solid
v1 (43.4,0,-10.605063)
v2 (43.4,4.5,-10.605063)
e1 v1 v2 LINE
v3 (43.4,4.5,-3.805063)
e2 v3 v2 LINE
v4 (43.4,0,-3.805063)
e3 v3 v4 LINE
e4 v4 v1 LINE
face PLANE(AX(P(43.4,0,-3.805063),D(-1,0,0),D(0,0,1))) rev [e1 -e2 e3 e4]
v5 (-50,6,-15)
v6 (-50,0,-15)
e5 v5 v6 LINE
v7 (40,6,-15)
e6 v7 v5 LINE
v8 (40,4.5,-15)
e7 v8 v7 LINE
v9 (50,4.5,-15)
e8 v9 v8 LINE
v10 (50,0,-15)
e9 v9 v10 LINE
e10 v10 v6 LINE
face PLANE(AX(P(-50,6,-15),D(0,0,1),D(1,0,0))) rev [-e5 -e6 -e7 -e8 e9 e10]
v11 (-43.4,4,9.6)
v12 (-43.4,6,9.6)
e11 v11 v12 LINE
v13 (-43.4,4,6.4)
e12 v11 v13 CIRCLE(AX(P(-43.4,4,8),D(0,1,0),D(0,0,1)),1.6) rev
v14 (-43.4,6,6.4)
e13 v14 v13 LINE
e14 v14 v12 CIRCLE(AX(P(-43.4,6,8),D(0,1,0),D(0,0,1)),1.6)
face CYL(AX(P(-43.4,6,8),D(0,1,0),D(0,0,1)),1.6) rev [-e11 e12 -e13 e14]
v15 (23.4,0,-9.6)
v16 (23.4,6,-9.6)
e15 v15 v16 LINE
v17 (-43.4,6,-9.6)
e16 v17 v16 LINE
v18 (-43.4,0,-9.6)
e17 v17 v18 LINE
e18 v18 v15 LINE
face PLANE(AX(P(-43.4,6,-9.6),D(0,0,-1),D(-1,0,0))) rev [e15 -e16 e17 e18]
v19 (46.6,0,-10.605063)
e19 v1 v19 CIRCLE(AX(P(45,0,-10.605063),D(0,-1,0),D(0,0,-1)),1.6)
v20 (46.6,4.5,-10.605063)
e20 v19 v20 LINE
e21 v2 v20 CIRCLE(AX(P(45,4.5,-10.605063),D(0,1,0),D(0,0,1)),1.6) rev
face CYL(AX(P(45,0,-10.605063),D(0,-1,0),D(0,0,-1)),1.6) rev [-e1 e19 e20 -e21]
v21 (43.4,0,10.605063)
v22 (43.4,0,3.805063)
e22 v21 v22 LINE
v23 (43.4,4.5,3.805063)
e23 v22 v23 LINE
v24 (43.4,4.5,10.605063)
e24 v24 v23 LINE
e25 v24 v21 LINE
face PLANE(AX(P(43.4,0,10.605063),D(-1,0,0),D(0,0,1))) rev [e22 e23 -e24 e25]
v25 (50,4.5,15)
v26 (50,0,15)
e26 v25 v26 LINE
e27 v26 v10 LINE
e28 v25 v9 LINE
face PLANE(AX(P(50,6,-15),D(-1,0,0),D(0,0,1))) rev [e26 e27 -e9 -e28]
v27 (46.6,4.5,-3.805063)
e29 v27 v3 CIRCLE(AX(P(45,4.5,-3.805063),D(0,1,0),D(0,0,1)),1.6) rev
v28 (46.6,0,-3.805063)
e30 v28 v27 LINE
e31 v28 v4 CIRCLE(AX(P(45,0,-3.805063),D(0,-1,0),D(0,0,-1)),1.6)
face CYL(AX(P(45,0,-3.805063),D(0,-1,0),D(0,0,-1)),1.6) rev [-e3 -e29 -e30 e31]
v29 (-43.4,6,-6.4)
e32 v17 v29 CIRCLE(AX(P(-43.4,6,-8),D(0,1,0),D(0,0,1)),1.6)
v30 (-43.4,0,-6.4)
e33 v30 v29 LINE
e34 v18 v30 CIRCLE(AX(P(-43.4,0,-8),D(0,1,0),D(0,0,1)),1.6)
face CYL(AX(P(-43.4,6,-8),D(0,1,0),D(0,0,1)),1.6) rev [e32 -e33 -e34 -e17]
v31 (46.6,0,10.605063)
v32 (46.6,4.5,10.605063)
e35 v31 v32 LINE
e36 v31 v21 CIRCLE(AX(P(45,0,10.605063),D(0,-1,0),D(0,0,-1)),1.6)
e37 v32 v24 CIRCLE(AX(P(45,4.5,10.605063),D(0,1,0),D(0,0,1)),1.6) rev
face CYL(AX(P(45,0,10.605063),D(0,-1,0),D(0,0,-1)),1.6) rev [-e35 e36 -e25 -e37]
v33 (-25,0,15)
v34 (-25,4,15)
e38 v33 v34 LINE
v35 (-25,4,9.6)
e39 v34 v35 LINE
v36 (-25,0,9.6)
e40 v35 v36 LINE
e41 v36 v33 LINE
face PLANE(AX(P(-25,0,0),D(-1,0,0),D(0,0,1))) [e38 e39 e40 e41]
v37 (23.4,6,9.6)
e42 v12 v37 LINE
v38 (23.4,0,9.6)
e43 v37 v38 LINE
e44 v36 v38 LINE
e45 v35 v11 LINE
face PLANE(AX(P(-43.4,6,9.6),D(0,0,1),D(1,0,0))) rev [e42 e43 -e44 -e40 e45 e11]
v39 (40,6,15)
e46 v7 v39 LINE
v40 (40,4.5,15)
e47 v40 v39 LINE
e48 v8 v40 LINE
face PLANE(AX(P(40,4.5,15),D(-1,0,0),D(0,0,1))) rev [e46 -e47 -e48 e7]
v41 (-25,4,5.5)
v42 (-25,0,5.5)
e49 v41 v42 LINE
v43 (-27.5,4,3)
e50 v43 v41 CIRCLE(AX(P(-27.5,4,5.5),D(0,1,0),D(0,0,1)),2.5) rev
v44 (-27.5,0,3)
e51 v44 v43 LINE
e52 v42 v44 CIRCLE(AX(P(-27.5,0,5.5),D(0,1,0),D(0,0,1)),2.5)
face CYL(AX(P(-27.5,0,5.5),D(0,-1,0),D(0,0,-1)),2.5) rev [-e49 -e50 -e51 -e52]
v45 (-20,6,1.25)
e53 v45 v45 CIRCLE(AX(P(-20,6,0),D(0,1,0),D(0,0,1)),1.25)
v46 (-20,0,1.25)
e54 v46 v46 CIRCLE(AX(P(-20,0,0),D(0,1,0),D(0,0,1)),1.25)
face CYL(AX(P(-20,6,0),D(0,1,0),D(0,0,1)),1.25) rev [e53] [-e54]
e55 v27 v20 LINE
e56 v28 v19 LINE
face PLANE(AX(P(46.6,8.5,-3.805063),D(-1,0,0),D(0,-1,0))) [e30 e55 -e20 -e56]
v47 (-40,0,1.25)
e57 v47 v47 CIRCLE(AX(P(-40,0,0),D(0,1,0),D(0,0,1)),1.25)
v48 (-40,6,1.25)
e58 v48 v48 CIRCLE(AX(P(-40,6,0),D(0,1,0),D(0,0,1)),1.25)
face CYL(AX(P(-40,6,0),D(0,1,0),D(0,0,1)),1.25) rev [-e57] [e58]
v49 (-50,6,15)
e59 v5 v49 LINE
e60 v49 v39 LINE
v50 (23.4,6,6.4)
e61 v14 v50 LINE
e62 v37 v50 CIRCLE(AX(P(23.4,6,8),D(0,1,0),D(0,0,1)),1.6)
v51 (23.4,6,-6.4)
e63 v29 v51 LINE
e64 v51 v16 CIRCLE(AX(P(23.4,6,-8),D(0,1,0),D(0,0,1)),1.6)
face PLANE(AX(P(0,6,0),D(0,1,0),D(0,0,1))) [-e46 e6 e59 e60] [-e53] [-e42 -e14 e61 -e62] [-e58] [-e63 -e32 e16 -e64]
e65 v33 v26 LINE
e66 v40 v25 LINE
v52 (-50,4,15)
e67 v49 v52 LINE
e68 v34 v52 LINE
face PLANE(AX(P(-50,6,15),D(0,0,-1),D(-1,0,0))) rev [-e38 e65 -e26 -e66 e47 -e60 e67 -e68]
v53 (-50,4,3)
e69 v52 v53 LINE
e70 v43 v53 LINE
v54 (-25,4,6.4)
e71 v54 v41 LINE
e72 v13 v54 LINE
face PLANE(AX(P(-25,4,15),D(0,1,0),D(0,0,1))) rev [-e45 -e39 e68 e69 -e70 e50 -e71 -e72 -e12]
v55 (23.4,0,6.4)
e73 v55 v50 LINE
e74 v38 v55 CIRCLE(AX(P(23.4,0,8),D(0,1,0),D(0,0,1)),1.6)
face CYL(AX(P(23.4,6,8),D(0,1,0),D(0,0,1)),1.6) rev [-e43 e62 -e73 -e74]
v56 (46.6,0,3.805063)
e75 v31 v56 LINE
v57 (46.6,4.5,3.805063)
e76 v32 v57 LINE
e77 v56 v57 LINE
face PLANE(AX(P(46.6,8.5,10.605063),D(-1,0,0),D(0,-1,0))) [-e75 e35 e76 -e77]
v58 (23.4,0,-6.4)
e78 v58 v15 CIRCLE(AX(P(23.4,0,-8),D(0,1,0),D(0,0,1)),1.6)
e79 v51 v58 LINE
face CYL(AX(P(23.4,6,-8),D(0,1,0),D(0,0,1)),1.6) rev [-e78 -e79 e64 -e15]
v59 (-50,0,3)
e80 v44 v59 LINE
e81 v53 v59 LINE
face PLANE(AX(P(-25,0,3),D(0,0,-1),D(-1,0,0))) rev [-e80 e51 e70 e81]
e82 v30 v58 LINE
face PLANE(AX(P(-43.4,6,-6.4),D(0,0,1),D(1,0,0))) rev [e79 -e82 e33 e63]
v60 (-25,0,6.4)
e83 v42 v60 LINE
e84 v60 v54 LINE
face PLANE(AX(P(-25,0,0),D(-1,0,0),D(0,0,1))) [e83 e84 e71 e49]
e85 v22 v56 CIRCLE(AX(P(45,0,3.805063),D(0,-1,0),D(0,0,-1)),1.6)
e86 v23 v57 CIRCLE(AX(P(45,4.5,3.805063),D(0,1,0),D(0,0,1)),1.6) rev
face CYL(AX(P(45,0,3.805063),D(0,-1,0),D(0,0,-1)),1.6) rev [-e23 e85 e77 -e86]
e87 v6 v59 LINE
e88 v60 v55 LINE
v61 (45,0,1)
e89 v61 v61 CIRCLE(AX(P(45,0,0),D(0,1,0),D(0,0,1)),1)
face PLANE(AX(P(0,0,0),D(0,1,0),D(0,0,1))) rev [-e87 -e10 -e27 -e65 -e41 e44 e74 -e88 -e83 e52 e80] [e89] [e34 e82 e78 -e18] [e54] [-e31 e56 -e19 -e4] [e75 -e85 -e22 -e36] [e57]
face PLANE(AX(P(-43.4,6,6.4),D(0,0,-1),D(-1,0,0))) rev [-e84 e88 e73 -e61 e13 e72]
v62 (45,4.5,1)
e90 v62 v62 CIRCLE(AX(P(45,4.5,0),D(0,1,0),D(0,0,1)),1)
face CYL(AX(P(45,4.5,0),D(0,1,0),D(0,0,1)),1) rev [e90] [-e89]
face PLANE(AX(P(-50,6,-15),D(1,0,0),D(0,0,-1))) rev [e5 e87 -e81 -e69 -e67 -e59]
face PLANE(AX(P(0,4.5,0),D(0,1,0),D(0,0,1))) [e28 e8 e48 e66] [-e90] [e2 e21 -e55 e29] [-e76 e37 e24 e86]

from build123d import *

# Parameters (mm, degrees)
SKIZZE1_W                       = 100
SKIZZE1_H                       = 30
AUFSATZ_LINEAR_AUSTRAGEN1_DEPTH = 6
DURCHGANGSLOCH_F_R_M31_DEPTH    = 6
DURCHGANGSLOCH_F_R_M32_DEPTH    = 6
M3_GEWINDEBOHRUNG1_D            = 2.5
SKIZZE12_W                      = 12
SKIZZE12_H                      = 4
SCHNITT_LINEAR_AUSTRAGEN1_DEPTH = 25
VERRUNDUNG1_R                   = 2.5
SKIZZE13_W                      = 10
SKIZZE13_H                      = 30
SCHNITT_LINEAR_AUSTRAGEN2_DEPTH = 1.5
F_2_0MM_STIFTLOCH1_D            = 2
F_2_0MM_STIFTLOCH1_DEPTH        = 8.5
F_2_0MM_STIFTLOCH1_TIP          = 0.600860619


# Read off the part's stored shape, not the designer's step: Durchgangsloch für M31, Durchgangsloch für M32
with BuildPart() as part:
    # Skizze1 → Aufsatz-Linear austragen1 (new body)
    with BuildSketch(Plane(origin=(0, 0, 0), x_dir=(1, 0, 0), z_dir=(0, 1, 0))):
        Rectangle(SKIZZE1_W, SKIZZE1_H)
    extrude(amount=AUFSATZ_LINEAR_AUSTRAGEN1_DEPTH)

    # Durchgangsloch für M31 outline → Durchgangsloch für M31 (cut)
    with BuildSketch(Plane(origin=(0, 0, 0), x_dir=(1, 0, 0), z_dir=(0, 1, 0))):
        with BuildLine():
            Line((-43.4, -9.6), (23.4, -9.6))
            ThreePointArc((23.4, -9.6), (25, -8), (23.4, -6.4))
            Line((23.4, -6.4), (-43.4, -6.4))
            ThreePointArc((-43.4, -6.4), (-45, -8), (-43.4, -9.6))
        make_face()
        with BuildLine():
            Line((-43.4, 6.4), (23.4, 6.4))
            ThreePointArc((23.4, 6.4), (25, 8), (23.4, 9.6))
            Line((23.4, 9.6), (-43.4, 9.6))
            ThreePointArc((-43.4, 9.6), (-45, 8), (-43.4, 6.4))
        make_face()
    extrude(amount=DURCHGANGSLOCH_F_R_M31_DEPTH, mode=Mode.SUBTRACT)

    # Durchgangsloch für M32 outline → Durchgangsloch für M32 (cut)
    with BuildSketch(Plane(origin=(0, 0, 0), x_dir=(1, 0, 0), z_dir=(0, 1, 0))):
        with BuildLine():
            ThreePointArc((46.6, 10.605062793), (45, 12.205062793), (43.4, 10.605062793))
            Line((43.4, 10.605062793), (43.4, 3.805062793))
            ThreePointArc((43.4, 3.805062793), (45, 2.205062793), (46.6, 3.805062793))
            Line((46.6, 3.805062793), (46.6, 10.605062793))
        make_face()
        with BuildLine():
            Line((46.6, -10.605062793), (46.6, -3.805062793))
            ThreePointArc((46.6, -3.805062793), (45, -2.205062793), (43.4, -3.805062793))
            Line((43.4, -3.805062793), (43.4, -10.605062793))
            ThreePointArc((43.4, -10.605062793), (45, -12.205062793), (46.6, -10.605062793))
        make_face()
    extrude(amount=DURCHGANGSLOCH_F_R_M32_DEPTH, mode=Mode.SUBTRACT)

    # M3 Gewindebohrung1 (through all)
    with Locations(Plane(origin=(0, 6, 0), x_dir=(1, 0, 0), z_dir=(0, 1, 0))):
        with Locations((-40, 0), (-20, 0)):
            Hole(M3_GEWINDEBOHRUNG1_D / 2)

    # Skizze12 → Schnitt-Linear austragen1 (cut)
    with BuildSketch(Plane.ZY.offset(50)):
        with Locations((9, 2)):
            Rectangle(SKIZZE12_W, SKIZZE12_H)
    extrude(amount=-SCHNITT_LINEAR_AUSTRAGEN1_DEPTH, mode=Mode.SUBTRACT)

    # Verrundung1
    verrundung1_edges = [part.edges().sort_by_distance(p)[0] for p in [
        (-25, 2, 3),
    ]]
    fillet(verrundung1_edges, radius=VERRUNDUNG1_R)

    # Skizze13 → Schnitt-Linear austragen2 (cut)
    with BuildSketch(Plane(origin=(0, 6, 0), x_dir=(1, 0, 0), z_dir=(0, 1, 0))):
        with Locations((45, 0)):
            Rectangle(SKIZZE13_W, SKIZZE13_H)
    extrude(amount=-SCHNITT_LINEAR_AUSTRAGEN2_DEPTH, mode=Mode.SUBTRACT)

    # Ø2.0mm Stiftloch1
    with Locations(Plane(origin=(0, 4.5, 0), x_dir=(1, 0, 0), z_dir=(0, 1, 0))):
        with Locations((45, 0)):
            Hole(F_2_0MM_STIFTLOCH1_D / 2, depth=F_2_0MM_STIFTLOCH1_DEPTH)
            with Locations((0, 0, -(F_2_0MM_STIFTLOCH1_DEPTH + F_2_0MM_STIFTLOCH1_TIP / 2))):  # 118° drill point
                Cone(0, F_2_0MM_STIFTLOCH1_D / 2, F_2_0MM_STIFTLOCH1_TIP, mode=Mode.SUBTRACT)


solid = part.part
